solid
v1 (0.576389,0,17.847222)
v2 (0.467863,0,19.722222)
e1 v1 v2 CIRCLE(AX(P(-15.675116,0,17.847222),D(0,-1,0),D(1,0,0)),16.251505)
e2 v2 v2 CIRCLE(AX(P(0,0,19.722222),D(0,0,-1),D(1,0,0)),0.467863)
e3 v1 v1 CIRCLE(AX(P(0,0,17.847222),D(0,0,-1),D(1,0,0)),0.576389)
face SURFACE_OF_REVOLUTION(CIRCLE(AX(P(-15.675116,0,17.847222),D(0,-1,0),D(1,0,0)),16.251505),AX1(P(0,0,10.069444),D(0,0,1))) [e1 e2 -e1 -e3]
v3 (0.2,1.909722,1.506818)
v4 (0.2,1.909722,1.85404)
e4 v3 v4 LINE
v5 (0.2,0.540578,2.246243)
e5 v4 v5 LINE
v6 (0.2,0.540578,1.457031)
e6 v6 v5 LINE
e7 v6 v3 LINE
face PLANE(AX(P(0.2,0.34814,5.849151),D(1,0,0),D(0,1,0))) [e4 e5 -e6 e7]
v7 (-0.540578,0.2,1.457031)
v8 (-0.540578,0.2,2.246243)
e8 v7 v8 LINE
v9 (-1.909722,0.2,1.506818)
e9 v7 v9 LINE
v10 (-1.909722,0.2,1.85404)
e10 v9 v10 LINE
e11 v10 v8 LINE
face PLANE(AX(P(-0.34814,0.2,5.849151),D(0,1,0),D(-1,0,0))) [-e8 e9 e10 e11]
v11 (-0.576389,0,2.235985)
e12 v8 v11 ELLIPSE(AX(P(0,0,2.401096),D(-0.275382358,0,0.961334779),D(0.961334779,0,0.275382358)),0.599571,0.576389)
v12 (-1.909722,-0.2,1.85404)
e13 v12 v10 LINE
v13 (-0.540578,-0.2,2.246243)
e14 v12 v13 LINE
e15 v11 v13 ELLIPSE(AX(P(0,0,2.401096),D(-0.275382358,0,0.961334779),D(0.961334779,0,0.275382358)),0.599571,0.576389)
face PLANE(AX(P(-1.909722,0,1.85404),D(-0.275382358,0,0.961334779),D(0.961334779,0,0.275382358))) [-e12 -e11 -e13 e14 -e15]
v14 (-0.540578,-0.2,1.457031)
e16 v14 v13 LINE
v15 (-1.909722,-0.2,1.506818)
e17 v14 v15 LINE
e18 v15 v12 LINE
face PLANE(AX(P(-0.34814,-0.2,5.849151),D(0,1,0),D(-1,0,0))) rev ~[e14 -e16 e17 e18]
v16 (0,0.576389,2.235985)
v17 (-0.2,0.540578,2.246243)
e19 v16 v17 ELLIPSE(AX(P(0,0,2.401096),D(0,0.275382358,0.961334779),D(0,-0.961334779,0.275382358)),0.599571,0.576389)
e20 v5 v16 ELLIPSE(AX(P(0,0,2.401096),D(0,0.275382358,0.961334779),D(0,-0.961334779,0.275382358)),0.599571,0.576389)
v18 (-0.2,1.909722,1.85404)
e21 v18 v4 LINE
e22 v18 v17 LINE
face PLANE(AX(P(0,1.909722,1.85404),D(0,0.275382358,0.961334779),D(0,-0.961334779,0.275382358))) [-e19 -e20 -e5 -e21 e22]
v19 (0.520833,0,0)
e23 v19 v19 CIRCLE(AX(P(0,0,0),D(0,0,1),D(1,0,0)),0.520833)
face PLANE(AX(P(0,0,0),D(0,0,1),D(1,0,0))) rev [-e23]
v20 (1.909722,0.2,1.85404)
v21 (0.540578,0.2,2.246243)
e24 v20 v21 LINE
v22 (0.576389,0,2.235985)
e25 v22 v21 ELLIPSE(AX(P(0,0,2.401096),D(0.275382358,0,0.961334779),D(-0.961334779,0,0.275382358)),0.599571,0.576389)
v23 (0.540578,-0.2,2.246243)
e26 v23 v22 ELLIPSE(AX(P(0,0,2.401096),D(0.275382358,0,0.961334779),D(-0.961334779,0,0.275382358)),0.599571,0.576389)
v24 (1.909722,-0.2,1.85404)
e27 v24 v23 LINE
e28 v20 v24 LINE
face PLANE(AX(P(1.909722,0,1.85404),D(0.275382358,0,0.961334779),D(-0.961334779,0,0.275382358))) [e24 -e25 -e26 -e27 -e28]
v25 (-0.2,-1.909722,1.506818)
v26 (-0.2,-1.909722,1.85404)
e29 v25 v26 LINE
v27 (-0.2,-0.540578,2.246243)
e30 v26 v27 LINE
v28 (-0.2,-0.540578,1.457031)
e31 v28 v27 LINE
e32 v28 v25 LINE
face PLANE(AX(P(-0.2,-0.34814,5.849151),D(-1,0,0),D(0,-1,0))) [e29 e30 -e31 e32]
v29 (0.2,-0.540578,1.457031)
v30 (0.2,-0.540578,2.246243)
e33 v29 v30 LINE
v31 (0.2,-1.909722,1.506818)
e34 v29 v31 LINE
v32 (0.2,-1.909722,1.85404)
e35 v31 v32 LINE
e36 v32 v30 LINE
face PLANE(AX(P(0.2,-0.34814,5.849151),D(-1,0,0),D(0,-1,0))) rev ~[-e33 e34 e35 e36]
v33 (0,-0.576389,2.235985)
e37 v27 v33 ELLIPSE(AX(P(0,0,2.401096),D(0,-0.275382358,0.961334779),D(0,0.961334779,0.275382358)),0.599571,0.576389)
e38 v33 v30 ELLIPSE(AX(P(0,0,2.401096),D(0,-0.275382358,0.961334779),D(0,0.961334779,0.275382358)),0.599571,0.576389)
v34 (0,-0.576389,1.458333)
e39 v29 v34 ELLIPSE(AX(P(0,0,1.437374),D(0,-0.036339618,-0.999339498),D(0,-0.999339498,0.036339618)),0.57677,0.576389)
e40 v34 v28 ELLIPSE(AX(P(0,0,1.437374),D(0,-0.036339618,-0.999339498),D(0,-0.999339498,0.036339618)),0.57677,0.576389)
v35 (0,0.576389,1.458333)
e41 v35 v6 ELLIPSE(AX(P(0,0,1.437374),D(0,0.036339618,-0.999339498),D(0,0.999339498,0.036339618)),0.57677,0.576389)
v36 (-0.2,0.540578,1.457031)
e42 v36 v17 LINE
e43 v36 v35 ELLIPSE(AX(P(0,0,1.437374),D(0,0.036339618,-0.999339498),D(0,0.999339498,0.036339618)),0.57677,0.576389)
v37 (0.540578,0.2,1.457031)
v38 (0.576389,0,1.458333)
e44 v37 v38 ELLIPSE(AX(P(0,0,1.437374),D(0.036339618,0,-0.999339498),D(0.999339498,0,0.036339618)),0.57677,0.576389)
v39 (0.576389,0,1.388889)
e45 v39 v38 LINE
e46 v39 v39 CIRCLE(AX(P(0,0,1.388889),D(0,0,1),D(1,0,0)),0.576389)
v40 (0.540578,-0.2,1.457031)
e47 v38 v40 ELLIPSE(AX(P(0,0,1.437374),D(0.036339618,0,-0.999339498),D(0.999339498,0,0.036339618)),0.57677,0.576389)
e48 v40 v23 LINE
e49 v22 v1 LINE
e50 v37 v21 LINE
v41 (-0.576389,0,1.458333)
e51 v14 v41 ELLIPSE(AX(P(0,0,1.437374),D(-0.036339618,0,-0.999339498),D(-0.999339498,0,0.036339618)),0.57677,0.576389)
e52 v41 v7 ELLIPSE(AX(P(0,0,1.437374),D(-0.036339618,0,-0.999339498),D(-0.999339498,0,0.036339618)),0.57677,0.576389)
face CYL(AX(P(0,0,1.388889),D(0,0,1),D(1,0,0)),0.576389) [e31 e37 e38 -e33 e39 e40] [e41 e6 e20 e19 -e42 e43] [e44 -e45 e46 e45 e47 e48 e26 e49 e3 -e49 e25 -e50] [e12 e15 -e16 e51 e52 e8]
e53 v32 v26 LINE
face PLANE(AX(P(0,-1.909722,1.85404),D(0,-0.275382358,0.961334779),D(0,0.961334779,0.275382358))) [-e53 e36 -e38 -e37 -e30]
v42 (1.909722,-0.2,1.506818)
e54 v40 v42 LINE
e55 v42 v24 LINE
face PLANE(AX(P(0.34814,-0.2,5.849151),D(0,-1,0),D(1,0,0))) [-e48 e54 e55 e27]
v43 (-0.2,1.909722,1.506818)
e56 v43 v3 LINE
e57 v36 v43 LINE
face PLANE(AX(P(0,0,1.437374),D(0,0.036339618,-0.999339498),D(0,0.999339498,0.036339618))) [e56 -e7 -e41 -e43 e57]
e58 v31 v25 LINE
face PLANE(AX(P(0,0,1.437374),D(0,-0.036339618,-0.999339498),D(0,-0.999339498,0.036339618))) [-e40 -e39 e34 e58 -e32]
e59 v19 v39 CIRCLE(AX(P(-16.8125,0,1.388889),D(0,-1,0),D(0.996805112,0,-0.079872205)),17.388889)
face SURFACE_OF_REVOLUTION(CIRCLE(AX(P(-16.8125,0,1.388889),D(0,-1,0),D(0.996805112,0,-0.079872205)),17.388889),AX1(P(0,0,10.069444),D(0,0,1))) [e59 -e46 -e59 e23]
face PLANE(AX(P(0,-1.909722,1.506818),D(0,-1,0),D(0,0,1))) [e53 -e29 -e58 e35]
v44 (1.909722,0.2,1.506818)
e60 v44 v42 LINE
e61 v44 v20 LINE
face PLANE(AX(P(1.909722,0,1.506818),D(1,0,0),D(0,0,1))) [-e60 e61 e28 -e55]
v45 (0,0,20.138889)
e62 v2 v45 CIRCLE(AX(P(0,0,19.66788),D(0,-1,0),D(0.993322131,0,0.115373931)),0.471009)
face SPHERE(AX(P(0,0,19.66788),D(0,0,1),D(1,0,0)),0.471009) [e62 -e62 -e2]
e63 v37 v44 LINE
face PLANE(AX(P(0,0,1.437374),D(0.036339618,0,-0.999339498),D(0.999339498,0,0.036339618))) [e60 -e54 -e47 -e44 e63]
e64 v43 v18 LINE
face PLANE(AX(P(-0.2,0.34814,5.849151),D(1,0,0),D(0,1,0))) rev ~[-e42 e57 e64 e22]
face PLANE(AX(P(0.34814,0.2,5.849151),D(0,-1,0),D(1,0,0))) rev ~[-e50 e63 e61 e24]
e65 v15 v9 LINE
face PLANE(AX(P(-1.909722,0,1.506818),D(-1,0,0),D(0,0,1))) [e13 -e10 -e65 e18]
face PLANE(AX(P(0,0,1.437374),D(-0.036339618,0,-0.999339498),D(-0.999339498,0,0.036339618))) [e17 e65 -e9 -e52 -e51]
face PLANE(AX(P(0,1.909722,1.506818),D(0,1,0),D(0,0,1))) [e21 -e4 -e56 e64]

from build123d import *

# Parameters (mm, degrees)
F3_DEPTH = 0.2
F4_COUNT = 4


# Not quite as in the source:
# - a feature names something its author has since deleted; it is built from what else it names


with BuildPart() as f1:
    # F0 (on Front) → F1 (revolve)
    with BuildSketch(Plane.XZ):
        with BuildLine():
            Line((0, 20.1388888889), (0, 0))
            Line((0, 0), (0.5208333333, 0))
            ThreePointArc((0.5208333333, 0), (0.5624944489, 0.6938891109), (0.5763888889, 1.3888888889))
            Line((0.5763888889, 1.3888888889), (0.5763888889, 17.8472222222))
            ThreePointArc((0.5763888889, 17.8472222222), (0.5492348486, 18.7862912781), (0.467863469, 19.7222222222))
            ThreePointArc((0.467863469, 19.7222222222), (0.3132520298, 20.01962212), (0, 20.1388888889))
        make_face()
    revolve(axis=Axis((0, 0, 10.0694444444), (0, 0, 1)))

    # F2 (on Front) → F3 (join, symmetric)
    with BuildSketch(Plane.XZ):
        Polygon((0, 11.1135402694), (0, 1.4373737374), (1.9097222222, 1.5068181818), (1.9097222222, 1.854040404), (0.4, 2.2865129156), (0.4, 11.3888888889), align=None)
    extrude(amount=F3_DEPTH, both=True)

    # F4: F1 ×4 about axis
    f4_axis = Axis((0, 0, 1.3888888889), (0, 0, 1))


with BuildPart() as f1_1:
    add(f1.part)
    for i in range(1, F4_COUNT):
        add(f1.part.rotate(f4_axis, i * 360 / F4_COUNT))


solid = f1_1.part
